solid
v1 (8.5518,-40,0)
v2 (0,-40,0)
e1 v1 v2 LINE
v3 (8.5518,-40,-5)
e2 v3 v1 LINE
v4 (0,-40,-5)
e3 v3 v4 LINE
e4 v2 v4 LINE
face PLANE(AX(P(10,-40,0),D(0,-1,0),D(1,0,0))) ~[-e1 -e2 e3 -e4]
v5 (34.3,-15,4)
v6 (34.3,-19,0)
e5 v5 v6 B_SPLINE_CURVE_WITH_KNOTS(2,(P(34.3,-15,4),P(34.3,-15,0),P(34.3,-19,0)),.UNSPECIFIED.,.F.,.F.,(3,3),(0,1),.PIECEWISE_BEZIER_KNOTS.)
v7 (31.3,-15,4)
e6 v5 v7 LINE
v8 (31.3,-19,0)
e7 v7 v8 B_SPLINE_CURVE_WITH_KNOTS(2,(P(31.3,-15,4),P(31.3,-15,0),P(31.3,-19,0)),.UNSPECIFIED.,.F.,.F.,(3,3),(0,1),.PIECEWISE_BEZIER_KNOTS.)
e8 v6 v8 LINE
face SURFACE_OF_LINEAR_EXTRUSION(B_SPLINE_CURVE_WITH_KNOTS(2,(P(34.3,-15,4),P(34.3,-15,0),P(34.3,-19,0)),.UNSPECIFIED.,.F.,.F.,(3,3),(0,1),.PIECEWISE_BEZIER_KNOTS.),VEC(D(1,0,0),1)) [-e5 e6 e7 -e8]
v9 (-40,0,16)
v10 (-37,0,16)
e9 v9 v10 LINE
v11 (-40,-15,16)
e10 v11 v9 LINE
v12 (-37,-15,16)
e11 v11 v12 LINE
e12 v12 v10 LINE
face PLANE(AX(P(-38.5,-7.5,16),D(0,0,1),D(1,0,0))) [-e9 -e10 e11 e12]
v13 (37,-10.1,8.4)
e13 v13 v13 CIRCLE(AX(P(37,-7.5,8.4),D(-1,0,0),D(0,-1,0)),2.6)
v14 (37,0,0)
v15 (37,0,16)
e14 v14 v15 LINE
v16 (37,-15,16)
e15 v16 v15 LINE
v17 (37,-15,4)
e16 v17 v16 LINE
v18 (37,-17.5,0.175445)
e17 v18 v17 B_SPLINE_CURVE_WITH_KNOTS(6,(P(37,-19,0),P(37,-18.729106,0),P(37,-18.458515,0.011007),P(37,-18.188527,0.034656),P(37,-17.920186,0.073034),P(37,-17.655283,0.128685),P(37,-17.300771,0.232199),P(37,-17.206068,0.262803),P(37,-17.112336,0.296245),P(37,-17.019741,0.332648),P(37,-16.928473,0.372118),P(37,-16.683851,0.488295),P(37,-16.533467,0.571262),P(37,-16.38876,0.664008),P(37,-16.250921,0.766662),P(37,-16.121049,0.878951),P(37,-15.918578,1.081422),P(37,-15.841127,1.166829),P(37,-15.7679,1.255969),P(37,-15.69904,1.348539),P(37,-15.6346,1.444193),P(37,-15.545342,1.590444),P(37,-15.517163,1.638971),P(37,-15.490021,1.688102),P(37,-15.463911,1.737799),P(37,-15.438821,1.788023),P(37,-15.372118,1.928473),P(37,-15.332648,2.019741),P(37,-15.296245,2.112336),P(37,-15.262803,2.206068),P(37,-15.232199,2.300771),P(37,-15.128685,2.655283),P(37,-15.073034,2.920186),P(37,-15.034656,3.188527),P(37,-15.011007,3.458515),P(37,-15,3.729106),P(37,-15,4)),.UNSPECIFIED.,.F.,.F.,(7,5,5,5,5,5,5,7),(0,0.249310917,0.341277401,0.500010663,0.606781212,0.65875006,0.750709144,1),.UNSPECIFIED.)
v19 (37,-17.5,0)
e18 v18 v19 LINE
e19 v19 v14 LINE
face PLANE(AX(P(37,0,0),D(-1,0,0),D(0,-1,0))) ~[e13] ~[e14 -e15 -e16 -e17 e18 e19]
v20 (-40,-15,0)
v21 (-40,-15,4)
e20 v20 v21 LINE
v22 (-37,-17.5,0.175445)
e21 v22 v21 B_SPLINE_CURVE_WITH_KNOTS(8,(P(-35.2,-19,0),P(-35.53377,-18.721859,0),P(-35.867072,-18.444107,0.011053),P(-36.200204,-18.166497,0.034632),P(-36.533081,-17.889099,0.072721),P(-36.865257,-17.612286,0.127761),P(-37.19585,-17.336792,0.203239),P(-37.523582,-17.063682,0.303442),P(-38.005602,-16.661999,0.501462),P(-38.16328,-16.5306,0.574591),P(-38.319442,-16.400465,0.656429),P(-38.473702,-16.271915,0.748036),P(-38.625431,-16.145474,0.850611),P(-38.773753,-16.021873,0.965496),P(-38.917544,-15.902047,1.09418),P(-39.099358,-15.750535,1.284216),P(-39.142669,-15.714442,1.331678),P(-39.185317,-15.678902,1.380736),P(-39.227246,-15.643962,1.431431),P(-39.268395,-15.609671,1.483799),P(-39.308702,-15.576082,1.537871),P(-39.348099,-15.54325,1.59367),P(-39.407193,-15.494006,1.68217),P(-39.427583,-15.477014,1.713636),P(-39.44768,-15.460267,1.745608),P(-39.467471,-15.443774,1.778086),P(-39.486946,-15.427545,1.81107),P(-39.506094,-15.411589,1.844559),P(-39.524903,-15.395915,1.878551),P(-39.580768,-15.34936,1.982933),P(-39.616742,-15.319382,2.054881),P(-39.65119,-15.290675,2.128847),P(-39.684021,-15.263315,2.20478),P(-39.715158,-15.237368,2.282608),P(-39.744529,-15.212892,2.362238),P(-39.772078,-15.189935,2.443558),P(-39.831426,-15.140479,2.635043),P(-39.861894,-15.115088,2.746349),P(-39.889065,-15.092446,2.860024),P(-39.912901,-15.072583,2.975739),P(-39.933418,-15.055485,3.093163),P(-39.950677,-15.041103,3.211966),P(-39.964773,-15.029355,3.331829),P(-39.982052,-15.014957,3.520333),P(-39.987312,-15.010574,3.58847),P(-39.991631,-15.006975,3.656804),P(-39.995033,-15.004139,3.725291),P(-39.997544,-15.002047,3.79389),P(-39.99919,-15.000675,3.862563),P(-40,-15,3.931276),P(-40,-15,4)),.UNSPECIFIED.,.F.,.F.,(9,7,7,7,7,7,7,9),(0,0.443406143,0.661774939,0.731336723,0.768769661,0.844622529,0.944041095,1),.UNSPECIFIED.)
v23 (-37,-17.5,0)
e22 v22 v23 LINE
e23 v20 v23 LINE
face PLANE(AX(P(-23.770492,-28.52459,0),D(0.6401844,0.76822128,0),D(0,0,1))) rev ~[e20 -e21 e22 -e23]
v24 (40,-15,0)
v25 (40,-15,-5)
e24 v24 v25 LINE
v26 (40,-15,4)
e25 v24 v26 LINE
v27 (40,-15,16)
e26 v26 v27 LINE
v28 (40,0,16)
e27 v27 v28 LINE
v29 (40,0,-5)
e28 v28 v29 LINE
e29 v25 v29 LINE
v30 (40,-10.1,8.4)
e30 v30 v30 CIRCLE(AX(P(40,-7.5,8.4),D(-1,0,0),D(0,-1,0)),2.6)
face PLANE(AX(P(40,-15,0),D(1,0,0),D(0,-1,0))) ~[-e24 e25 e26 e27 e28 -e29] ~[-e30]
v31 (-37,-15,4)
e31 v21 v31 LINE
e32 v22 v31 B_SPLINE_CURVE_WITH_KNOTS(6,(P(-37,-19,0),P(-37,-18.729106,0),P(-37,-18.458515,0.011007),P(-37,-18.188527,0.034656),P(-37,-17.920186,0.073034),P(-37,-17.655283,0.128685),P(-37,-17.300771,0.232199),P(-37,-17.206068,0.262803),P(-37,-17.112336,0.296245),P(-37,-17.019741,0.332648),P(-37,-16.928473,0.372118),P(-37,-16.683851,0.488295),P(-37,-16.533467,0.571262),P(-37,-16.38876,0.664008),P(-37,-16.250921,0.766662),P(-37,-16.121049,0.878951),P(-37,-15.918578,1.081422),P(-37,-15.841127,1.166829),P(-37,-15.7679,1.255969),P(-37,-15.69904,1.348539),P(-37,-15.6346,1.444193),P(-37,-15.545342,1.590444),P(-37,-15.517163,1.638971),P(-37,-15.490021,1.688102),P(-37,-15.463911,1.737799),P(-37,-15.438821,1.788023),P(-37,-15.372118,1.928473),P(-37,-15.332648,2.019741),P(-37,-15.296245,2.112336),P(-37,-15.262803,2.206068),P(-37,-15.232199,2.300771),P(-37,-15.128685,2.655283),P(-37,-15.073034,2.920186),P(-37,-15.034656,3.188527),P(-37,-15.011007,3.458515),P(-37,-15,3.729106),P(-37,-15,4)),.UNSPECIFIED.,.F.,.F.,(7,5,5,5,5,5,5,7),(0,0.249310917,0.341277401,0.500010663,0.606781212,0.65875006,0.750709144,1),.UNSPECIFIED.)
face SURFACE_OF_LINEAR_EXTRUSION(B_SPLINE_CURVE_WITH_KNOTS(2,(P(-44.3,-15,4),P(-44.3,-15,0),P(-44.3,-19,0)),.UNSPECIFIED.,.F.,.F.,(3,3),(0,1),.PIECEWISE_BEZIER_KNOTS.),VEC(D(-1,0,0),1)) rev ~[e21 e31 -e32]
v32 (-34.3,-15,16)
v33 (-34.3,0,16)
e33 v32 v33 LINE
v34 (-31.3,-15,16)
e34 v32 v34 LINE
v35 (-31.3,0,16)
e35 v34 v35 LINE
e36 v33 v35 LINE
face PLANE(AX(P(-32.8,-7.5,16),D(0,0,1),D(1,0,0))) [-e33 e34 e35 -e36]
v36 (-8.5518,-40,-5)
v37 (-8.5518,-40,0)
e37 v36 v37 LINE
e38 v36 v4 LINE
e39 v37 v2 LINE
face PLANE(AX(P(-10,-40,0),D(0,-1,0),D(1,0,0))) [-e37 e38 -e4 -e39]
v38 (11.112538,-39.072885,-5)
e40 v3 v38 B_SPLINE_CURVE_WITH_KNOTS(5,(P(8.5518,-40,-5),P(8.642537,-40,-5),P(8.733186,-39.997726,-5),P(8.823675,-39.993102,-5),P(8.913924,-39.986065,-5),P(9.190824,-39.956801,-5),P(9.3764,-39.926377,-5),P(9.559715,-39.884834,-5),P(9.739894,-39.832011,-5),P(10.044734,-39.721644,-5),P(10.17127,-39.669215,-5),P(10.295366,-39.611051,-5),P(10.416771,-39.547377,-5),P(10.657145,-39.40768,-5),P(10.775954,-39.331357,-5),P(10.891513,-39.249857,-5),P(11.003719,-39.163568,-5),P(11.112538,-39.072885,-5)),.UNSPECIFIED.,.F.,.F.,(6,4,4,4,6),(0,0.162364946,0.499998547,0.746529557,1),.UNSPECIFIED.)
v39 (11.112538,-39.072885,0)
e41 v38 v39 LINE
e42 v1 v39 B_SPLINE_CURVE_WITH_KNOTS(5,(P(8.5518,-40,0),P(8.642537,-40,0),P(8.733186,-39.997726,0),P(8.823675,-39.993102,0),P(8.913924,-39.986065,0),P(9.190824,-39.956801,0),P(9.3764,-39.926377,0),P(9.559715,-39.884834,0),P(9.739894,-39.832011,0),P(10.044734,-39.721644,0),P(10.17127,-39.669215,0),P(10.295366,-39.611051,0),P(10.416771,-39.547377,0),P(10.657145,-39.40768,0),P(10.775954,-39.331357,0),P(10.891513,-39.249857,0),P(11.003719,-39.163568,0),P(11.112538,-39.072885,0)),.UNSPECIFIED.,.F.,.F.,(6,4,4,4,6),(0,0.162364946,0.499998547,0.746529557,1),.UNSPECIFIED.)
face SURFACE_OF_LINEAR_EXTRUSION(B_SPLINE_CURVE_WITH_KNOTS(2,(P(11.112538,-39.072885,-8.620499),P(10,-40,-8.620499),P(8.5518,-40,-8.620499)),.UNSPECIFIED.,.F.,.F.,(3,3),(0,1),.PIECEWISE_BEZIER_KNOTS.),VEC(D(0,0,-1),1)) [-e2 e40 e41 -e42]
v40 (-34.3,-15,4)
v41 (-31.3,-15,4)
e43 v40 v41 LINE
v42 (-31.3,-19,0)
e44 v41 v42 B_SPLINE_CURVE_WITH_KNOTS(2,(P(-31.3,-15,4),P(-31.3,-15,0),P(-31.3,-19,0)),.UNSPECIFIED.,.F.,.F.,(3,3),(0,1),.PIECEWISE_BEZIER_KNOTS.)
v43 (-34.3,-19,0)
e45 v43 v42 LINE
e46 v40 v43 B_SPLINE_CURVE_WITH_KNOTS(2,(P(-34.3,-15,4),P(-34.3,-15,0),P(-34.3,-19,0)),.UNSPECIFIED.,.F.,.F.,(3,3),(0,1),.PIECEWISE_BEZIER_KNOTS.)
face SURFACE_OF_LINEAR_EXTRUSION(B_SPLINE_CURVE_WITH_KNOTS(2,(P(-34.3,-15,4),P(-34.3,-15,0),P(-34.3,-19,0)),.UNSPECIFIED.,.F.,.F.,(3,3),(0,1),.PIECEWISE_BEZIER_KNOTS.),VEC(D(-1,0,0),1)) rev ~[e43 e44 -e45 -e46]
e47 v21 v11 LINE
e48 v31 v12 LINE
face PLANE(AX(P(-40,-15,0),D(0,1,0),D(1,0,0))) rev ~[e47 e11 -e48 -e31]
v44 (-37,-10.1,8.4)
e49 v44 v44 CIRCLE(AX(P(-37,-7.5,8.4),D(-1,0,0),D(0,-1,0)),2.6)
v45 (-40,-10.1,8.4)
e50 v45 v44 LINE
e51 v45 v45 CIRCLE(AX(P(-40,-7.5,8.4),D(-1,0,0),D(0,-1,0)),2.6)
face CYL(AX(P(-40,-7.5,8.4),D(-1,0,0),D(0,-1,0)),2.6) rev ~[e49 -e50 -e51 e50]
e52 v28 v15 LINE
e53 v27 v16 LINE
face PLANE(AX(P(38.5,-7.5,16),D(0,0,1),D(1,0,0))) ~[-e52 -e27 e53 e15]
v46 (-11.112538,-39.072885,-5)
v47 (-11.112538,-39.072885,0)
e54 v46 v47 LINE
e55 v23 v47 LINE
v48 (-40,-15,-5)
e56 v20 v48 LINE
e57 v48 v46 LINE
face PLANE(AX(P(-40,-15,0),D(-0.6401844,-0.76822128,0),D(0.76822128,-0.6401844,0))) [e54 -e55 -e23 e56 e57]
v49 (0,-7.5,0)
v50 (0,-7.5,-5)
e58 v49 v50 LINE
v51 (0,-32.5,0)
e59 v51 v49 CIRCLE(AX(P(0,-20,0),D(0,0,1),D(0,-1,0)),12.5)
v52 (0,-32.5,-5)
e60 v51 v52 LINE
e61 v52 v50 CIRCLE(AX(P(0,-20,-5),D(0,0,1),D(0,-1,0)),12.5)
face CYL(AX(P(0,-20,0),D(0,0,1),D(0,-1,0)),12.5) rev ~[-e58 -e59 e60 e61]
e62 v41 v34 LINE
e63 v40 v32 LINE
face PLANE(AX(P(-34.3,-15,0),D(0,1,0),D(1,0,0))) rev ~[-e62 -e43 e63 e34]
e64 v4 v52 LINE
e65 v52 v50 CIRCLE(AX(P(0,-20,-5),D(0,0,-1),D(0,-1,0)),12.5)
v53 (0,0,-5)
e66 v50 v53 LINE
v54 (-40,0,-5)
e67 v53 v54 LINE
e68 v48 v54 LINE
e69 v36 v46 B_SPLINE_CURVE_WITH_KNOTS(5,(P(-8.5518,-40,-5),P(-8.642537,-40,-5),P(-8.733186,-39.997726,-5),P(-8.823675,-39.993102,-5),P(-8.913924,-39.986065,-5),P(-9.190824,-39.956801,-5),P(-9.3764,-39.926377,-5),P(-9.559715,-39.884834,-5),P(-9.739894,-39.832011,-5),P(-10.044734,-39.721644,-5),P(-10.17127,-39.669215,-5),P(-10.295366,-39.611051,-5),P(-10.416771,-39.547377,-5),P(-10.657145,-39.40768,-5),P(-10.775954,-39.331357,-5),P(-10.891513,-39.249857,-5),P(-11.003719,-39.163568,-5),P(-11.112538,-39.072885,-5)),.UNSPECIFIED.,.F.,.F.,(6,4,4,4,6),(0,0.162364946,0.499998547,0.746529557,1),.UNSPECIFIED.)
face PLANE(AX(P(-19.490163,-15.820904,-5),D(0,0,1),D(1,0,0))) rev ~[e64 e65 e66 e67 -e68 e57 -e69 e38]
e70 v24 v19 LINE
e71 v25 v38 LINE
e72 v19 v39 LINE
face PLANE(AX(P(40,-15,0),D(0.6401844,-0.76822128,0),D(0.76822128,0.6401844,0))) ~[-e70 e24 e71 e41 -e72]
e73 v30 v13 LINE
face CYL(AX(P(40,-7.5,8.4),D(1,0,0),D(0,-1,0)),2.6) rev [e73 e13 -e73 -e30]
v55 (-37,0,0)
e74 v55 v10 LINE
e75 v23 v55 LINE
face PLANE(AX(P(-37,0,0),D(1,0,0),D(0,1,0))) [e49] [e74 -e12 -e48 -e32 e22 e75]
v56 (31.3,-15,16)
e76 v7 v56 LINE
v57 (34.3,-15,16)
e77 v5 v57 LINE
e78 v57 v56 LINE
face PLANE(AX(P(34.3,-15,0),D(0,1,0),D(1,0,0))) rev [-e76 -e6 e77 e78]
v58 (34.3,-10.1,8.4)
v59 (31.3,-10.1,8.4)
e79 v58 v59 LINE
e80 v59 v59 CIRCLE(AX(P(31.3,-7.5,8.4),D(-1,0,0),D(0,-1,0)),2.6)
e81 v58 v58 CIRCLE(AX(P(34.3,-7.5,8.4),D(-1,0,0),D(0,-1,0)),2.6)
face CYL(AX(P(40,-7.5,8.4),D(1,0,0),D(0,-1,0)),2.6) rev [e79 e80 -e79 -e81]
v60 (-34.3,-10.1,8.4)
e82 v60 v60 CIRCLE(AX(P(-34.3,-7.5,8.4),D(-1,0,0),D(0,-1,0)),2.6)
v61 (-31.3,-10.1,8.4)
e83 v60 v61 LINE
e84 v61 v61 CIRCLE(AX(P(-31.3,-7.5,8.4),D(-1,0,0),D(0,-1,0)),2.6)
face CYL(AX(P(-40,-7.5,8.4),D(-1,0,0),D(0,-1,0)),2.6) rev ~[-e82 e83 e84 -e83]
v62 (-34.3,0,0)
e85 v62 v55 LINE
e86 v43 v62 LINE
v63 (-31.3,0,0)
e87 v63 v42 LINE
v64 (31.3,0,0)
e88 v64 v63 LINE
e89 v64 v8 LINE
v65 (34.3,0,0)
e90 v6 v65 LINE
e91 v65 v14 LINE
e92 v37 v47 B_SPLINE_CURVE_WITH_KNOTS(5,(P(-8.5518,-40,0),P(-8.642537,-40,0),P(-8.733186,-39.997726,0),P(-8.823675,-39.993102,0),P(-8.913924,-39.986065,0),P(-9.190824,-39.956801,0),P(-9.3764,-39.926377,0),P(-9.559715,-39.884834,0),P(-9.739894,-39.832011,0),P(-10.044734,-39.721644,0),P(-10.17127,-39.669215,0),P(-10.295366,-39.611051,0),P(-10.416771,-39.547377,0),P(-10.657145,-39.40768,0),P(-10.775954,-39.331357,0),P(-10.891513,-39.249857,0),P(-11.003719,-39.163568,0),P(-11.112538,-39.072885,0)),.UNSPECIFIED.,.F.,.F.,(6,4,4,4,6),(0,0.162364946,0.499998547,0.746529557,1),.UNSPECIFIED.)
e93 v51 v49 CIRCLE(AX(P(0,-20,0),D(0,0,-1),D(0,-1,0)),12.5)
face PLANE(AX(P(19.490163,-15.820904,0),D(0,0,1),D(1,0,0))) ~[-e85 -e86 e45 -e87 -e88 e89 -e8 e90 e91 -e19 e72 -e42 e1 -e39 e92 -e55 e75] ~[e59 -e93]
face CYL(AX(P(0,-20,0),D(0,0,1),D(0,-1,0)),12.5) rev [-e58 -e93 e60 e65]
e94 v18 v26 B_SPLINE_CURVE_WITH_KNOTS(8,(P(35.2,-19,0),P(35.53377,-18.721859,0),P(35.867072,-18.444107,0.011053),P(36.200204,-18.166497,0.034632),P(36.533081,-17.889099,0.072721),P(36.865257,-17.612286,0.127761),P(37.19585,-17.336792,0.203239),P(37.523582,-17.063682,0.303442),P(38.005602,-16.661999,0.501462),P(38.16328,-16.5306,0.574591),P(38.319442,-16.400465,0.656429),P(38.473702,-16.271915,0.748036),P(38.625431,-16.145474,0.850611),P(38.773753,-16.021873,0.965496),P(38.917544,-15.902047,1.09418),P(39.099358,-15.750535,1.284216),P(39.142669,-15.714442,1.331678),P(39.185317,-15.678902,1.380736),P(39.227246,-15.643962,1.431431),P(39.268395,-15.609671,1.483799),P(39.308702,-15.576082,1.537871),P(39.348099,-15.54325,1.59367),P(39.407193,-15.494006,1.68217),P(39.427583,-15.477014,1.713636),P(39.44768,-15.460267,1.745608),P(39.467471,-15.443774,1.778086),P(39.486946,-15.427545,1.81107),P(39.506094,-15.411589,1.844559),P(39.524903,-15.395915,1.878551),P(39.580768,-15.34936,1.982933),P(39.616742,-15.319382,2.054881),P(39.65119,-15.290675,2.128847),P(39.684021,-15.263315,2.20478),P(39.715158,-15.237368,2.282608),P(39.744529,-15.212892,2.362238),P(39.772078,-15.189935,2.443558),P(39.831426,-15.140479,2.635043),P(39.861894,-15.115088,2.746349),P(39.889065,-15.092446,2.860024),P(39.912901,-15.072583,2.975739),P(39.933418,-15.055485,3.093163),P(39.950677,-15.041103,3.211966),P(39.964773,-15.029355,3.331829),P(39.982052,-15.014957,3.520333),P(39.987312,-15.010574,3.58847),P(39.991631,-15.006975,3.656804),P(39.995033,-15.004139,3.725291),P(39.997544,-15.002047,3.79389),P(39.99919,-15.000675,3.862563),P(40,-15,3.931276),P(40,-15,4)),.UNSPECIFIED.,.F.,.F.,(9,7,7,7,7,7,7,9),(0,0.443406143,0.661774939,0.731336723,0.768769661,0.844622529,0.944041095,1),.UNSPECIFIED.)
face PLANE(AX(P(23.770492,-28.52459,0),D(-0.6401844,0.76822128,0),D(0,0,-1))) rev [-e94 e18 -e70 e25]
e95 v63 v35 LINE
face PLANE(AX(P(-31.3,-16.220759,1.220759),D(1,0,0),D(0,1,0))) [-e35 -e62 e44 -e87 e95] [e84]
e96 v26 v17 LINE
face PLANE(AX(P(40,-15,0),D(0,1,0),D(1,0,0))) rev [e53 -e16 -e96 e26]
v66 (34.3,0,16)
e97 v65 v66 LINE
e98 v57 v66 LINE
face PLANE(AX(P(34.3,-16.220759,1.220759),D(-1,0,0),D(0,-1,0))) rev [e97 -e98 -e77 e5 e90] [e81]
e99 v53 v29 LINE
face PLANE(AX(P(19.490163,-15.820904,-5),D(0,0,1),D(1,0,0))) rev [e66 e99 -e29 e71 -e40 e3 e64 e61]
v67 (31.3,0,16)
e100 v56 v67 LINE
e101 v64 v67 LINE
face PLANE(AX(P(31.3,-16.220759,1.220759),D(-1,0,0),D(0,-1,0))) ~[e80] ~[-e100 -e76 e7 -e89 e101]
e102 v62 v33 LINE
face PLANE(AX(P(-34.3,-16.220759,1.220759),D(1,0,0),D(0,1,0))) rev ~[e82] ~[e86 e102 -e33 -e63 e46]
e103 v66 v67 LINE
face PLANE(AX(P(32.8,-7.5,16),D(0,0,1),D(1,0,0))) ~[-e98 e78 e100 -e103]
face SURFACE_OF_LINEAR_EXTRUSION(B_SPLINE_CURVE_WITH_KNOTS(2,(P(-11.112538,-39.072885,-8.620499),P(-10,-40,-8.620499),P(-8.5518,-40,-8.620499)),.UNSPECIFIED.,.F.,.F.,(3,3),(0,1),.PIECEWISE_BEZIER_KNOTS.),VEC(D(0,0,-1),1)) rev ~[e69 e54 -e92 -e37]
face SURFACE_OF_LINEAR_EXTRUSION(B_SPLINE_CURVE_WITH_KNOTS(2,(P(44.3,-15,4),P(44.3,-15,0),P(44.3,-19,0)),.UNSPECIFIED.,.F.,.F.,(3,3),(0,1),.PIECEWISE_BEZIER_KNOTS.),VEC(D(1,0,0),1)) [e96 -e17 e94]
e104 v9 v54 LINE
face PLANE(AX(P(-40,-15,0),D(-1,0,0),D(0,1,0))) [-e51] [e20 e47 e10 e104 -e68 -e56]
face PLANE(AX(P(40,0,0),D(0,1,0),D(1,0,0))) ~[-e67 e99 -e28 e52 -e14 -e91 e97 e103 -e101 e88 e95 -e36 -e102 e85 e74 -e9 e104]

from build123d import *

# Parameters (mm, degrees)
F0_W         = 3
F0_H         = 15
F1_DEPTH     = 5
F2_DEPTH     = 16
F3_T1_DEPTH  = 3
F3_T6_DEPTH  = 23
F3_T12_DEPTH = 13
F3_T17_DEPTH = 23
F3_T20_DEPTH = 12.2409987036
F4_R         = 2.6
F5_DEPTH     = 40.0010001


# Not quite as in the source:
# - a fillet or chamfer that OpenCascade refuses, or shapes differently, is made with other operations: its cross-section is extruded or revolved along the edge and cut away or added


with BuildPart() as f1:
    # F0 (on Top) → F1 (new body)
    with BuildSketch(Plane.XY):
        with BuildLine():
            Line((-34.3, 0), (-37, 0))
            Line((-37, 0), (-37, -15))
            Line((-37, -15), (-40, -15))
            Line((-40, -15), (-10, -40))
            Line((-10, -40), (0, -40))
            Line((0, -40), (0, -32.5))
            ThreePointArc((0, -32.5), (-12.5, -20), (0, -7.5))
            Line((0, -7.5), (0, 0))
            Line((0, 0), (-31.3, 0))
            Line((-31.3, 0), (-31.3, -15))
            Line((-31.3, -15), (-34.3, -15))
            Line((-34.3, -15), (-34.3, 0))
        make_face()
        with Locations((-32.8, -7.5)):
            Rectangle(F0_W, F0_H)
        with Locations((-38.5, -7.5)):
            Rectangle(F0_W, F0_H)
    extrude(amount=-F1_DEPTH)

    # F0 (on Top) → F2 (join)
    with BuildSketch(Plane.XY):
        with Locations((-32.8, -7.5)):
            Rectangle(F0_W, F0_H)
        with Locations((-38.5, -7.5)):
            Rectangle(F0_W, F0_H)
    extrude(amount=F2_DEPTH)

    # F3: fillet of radius 4 on 3 edges, made by hand

    # F3_s2 → F3_t1 (join)
    with BuildSketch(Plane.YZ.offset(-34.3)):
        with BuildLine():
            add(Edge.make_bspline(
                [(-15, 4), (-15, 0), (-19, 0)],
                knots=[0, 0, 0, 1, 1, 1], degree=2, weights=[1, 1, 1]))
            Line((-19, 0), (-15, 0))
            Line((-15, 0), (-15, 4))
        make_face()
    extrude(amount=F3_T1_DEPTH)


with BuildPart() as f3_tool4:
    # F3_s5 → F3_t6 (new body)
    with BuildSketch(Plane.YZ.offset(-44.3)):
        with BuildLine():
            add(Edge.make_bspline(
                [(-15, 4), (-15, 0), (-19, 0)],
                knots=[0, 0, 0, 1, 1, 1], degree=2, weights=[1, 1, 1]))
            Line((-19, 0), (-15, 0))
            Line((-15, 0), (-15, 4))
        make_face()
    extrude(amount=F3_T6_DEPTH)

    split(bisect_by=Plane(origin=(-23.7704918033, -28.5245901639, 0), x_dir=(0, 0, 1), z_dir=(0.6401843997, 0.7682212796, 0)), keep=Keep.TOP)

    split(bisect_by=Plane.YZ.offset(-37), keep=Keep.BOTTOM)


with BuildPart() as f1_1:
    add(f1.part)

    # F3_t3: union F3_tool4
    add(f3_tool4.part)


with BuildPart() as f3_tool10:
    # F3_s11 → F3_t12 (new body)
    with BuildSketch(Plane.YZ.offset(-50)):
        with BuildLine():
            add(Edge.make_bspline(
                [(-15, 4), (-15, 0), (-19, 0)],
                knots=[0, 0, 0, 1, 1, 1], degree=2, weights=[1, 1, 1]))
            Line((-19, 0), (-15, 0))
            Line((-15, 0), (-15, 4))
        make_face()
    extrude(amount=F3_T12_DEPTH)

    split(bisect_by=Plane(origin=(-23.7704918033, -28.5245901639, 0), x_dir=(0, 0, 1), z_dir=(0.6401843997, 0.7682212796, 0)), keep=Keep.TOP)


with BuildPart() as f1_2:
    add(f1_1.part)

    # F3_t9: union F3_tool10
    add(f3_tool10.part)


with BuildPart() as f3_tool15:
    # F3_s16 → F3_t17 (new body)
    with BuildSketch(Plane.YZ.offset(-50)):
        with BuildLine():
            add(Edge.make_bspline(
                [(-15, 4), (-15, 0), (-19, 0)],
                knots=[0, 0, 0, 1, 1, 1], degree=2, weights=[1, 1, 1]))
            Line((-19, 0), (-15, 0))
            Line((-15, 0), (-15, 4))
        make_face()
    extrude(amount=F3_T17_DEPTH)

    split(bisect_by=Plane.YZ.offset(-31.3), keep=Keep.BOTTOM)

    split(bisect_by=Plane.YZ.offset(-34.3), keep=Keep.TOP)


with BuildPart() as f1_3:
    add(f1_2.part)

    # F3_t14: union F3_tool15
    add(f3_tool15.part)

    # F3_s21 → F3_t20 (cut)
    with BuildSketch(Plane.XY.offset(-8.6204993518)):
        with BuildLine():
            add(Edge.make_bspline(
                [(-11.1125378579, -39.0728851184), (-10, -40), (-8.5518002593, -40)],
                knots=[0, 0, 0, 1, 1, 1], degree=2, weights=[1, 1, 1]))
            Line((-8.5518002593, -40), (-10, -40))
            Line((-10, -40), (-11.1125378579, -39.0728851184))
        make_face()
    extrude(amount=F3_T20_DEPTH, mode=Mode.SUBTRACT)

    # F4 (on face) → F5 (cut, through all)
    with BuildSketch(Plane(origin=(-40, 0, 0), x_dir=(0, -1, 0), z_dir=(-1, 0, 0))):
        with Locations((7.5, 8.4)):
            Circle(F4_R)
    extrude(amount=-F5_DEPTH, mode=Mode.SUBTRACT)

    # F6: F1 across plane


with BuildPart() as f1_4:
    add(f1_3.part)
    add(f1_3.part.mirror(Plane.YZ))


solid = f1_4.part
